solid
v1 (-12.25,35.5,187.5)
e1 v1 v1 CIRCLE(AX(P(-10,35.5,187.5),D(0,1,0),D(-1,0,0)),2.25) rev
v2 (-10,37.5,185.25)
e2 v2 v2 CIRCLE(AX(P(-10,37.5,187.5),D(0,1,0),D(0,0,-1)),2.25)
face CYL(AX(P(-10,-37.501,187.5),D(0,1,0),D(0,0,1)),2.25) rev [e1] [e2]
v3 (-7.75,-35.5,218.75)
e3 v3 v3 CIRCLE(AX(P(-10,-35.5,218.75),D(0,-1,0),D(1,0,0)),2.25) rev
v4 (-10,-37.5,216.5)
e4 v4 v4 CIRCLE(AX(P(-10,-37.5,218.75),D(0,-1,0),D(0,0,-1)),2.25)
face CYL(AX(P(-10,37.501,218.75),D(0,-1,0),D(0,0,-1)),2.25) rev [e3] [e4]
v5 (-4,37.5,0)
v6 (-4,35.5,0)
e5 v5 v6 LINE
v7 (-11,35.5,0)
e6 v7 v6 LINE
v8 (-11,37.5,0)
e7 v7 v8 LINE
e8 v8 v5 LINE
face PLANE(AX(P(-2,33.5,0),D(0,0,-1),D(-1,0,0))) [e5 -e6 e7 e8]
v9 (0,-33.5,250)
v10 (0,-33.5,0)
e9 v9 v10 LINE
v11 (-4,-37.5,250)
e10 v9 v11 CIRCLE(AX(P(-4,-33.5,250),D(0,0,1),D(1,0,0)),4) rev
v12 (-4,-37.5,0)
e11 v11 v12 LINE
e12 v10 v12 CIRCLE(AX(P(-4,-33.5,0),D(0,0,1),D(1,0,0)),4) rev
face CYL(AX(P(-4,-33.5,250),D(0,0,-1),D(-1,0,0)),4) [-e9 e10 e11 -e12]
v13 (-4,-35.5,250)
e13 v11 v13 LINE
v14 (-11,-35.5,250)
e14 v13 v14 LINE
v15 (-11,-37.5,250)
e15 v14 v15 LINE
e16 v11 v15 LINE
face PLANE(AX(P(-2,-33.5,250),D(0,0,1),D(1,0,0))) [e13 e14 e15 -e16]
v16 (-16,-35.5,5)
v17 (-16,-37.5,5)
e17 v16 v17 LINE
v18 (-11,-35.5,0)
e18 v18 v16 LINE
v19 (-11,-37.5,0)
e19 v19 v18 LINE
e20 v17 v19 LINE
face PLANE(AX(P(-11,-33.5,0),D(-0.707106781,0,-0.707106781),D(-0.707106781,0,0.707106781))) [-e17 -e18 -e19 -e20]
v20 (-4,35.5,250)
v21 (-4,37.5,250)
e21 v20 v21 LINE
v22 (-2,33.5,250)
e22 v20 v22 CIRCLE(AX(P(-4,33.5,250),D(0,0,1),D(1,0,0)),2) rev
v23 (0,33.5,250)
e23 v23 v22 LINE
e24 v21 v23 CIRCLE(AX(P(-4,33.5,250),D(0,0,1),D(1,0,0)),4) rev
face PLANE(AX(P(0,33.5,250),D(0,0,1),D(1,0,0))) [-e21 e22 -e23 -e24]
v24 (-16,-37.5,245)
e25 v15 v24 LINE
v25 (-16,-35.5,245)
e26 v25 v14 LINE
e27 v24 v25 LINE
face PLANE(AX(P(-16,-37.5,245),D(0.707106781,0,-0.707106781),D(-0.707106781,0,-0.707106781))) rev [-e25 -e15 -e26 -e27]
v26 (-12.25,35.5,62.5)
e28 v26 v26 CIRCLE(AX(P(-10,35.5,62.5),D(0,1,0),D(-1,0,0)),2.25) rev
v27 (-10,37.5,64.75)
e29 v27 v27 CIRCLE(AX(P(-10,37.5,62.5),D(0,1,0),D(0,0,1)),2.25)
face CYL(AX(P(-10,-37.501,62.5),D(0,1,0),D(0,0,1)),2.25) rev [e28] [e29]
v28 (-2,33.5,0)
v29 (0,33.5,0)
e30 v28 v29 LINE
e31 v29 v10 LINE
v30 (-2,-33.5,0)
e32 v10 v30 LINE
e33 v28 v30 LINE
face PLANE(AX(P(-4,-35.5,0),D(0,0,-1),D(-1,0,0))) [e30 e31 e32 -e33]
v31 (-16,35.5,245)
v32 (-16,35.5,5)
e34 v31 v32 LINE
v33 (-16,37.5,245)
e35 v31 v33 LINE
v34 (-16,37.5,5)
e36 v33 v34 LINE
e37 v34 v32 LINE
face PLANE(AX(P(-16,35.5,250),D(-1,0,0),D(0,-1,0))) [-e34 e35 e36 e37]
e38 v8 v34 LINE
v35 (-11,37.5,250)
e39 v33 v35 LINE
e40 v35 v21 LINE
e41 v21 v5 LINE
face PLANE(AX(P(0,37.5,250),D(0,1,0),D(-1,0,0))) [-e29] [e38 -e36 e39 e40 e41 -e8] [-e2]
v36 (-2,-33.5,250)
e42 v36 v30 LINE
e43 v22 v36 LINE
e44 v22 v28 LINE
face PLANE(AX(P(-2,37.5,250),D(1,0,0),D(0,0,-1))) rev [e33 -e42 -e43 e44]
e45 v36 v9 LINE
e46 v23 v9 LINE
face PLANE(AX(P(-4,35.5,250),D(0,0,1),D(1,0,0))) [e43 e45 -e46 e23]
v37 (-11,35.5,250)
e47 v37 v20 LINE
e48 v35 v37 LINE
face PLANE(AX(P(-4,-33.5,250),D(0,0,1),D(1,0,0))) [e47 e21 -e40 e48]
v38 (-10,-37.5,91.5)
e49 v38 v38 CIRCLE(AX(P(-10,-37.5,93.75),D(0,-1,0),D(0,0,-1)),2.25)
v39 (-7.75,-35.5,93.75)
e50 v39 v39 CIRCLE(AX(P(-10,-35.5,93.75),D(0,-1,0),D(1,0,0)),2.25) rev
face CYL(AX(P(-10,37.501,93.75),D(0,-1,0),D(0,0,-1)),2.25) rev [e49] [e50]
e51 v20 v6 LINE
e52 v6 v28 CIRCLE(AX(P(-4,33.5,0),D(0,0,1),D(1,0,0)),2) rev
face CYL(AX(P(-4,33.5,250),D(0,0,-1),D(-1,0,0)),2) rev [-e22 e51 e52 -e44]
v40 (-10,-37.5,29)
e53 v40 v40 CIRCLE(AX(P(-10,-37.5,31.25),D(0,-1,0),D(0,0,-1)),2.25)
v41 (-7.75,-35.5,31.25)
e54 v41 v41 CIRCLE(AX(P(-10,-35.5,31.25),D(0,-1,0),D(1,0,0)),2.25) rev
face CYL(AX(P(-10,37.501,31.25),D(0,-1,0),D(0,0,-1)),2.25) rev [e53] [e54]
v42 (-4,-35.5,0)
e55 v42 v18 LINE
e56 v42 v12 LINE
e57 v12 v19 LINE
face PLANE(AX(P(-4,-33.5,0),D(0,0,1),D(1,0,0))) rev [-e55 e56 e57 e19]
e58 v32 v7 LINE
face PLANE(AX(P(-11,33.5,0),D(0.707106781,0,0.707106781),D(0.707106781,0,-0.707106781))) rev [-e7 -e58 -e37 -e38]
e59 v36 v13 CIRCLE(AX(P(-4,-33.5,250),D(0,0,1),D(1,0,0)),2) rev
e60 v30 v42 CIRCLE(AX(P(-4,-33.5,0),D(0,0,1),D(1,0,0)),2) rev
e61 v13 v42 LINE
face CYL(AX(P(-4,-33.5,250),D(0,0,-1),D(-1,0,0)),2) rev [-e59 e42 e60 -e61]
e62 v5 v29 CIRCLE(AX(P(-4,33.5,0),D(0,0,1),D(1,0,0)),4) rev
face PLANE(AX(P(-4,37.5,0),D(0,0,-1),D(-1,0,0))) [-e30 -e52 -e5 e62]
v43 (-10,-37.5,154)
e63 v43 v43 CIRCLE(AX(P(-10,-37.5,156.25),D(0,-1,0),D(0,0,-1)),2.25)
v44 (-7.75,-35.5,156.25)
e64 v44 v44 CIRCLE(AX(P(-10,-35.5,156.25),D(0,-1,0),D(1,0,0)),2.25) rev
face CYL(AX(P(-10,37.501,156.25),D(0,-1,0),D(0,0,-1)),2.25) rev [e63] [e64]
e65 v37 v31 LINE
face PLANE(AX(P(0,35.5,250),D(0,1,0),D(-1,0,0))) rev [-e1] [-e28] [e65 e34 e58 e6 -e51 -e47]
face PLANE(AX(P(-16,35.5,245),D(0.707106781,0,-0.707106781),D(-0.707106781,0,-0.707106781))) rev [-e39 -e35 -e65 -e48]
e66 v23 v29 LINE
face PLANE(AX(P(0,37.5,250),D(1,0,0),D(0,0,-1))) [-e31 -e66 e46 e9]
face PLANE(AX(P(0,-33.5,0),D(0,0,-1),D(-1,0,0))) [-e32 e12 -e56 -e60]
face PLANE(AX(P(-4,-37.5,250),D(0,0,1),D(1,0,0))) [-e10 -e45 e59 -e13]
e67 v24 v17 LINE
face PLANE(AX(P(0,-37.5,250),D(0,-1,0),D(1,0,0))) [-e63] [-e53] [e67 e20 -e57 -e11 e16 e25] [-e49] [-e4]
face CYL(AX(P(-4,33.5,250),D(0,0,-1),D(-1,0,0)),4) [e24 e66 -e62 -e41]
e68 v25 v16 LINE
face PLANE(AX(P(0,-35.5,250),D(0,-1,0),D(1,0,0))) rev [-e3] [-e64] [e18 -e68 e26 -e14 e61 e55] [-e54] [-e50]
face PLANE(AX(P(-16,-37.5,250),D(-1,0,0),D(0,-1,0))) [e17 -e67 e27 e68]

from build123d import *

# Parameters (mm, degrees)
BASE_FLANGE1_DEPTH = 250
CHAMFER1_SIZE      = 5
CUT_EXTRUDE1_REACH = 263.498
SKETCH3_R          = 2.25
CUT_EXTRUDE2_REACH = 263.498
SKETCH4_R          = 2.25


# Sheet-metal steps are written as plain solids
with BuildPart() as part:
    # Sketch1 → Base-Flange1 (new body)
    with BuildSketch(Plane.XY):
        with BuildLine():
            Line((-16, 37.5), (-4, 37.5))
            ThreePointArc((-4, 37.5), (-1.171572875, 36.328427125), (0, 33.5))
            Line((0, 33.5), (0, -33.5))
            ThreePointArc((0, -33.5), (-1.171572875, -36.328427125), (-4, -37.5))
            Line((-4, -37.5), (-16, -37.5))
            Line((-16, -37.5), (-16, -35.5))
            Line((-16, -35.5), (-4, -35.5))
            ThreePointArc((-4, -35.5), (-2.585786438, -34.914213562), (-2, -33.5))
            Line((-2, -33.5), (-2, 33.5))
            ThreePointArc((-2, 33.5), (-2.585786438, 34.914213562), (-4, 35.5))
            Line((-4, 35.5), (-16, 35.5))
            Line((-16, 35.5), (-16, 37.5))
        make_face()
    extrude(amount=BASE_FLANGE1_DEPTH)

    # Chamfer1
    chamfer1_edges = [part.edges().sort_by_distance(p)[0] for p in [
        (-16, 36.5, 0),
        (-16, -36.5, 0),
        (-16, 36.5, 250),
        (-16, -36.5, 250),
    ]]
    chamfer(chamfer1_edges, length=CHAMFER1_SIZE)

    # Sketch3 → Cut-Extrude1 (cut, up to next)
    with BuildSketch(Plane(origin=(0, 37.5, 0), x_dir=(1, 0, 0), z_dir=(0, 1, 0)), mode=Mode.PRIVATE) as cut_extrude1_sk1:
        with Locations(Location((-10, -62.5, 0), (0, 0, 270))):
            Circle(SKETCH3_R)
    cut_extrude1_tool1 = extrude(cut_extrude1_sk1.sketch, amount=-CUT_EXTRUDE1_REACH, mode=Mode.PRIVATE) & part.part
    # Sketch3 → Cut-Extrude1 (cut, up to next)
    with BuildSketch(Plane(origin=(0, 37.5, 0), x_dir=(1, 0, 0), z_dir=(0, 1, 0)), mode=Mode.PRIVATE) as cut_extrude1_sk2:
        with Locations(Location((-10, -187.5, 0), (0, 0, 180))):
            Circle(SKETCH3_R)
    cut_extrude1_tool2 = extrude(cut_extrude1_sk2.sketch, amount=-CUT_EXTRUDE1_REACH, mode=Mode.PRIVATE) & part.part
    add(cut_extrude1_tool1.solids().sort_by_distance((-10, 37.5, 62.5))[0], mode=Mode.SUBTRACT)
    add(cut_extrude1_tool2.solids().sort_by_distance((-10, 37.5, 187.5))[0], mode=Mode.SUBTRACT)

    # Sketch4 → Cut-Extrude2 (cut, up to next)
    with BuildSketch(Plane.XZ.offset(37.5), mode=Mode.PRIVATE) as cut_extrude2_sk1:
        with Locations(Location((-10, 31.25, 0), (0, 0, 270))):
            Circle(SKETCH4_R)
    cut_extrude2_tool1 = extrude(cut_extrude2_sk1.sketch, amount=-CUT_EXTRUDE2_REACH, mode=Mode.PRIVATE) & part.part
    # Sketch4 → Cut-Extrude2 (cut, up to next)
    with BuildSketch(Plane.XZ.offset(37.5), mode=Mode.PRIVATE) as cut_extrude2_sk2:
        with Locations(Location((-10, 93.75, 0), (0, 0, 270))):
            Circle(SKETCH4_R)
    cut_extrude2_tool2 = extrude(cut_extrude2_sk2.sketch, amount=-CUT_EXTRUDE2_REACH, mode=Mode.PRIVATE) & part.part
    # Sketch4 → Cut-Extrude2 (cut, up to next)
    with BuildSketch(Plane.XZ.offset(37.5), mode=Mode.PRIVATE) as cut_extrude2_sk3:
        with Locations(Location((-10, 156.25, 0), (0, 0, 270))):
            Circle(SKETCH4_R)
    cut_extrude2_tool3 = extrude(cut_extrude2_sk3.sketch, amount=-CUT_EXTRUDE2_REACH, mode=Mode.PRIVATE) & part.part
    # Sketch4 → Cut-Extrude2 (cut, up to next)
    with BuildSketch(Plane.XZ.offset(37.5), mode=Mode.PRIVATE) as cut_extrude2_sk4:
        with Locations(Location((-10, 218.75, 0), (0, 0, 270))):
            Circle(SKETCH4_R)
    cut_extrude2_tool4 = extrude(cut_extrude2_sk4.sketch, amount=-CUT_EXTRUDE2_REACH, mode=Mode.PRIVATE) & part.part
    add(cut_extrude2_tool1.solids().sort_by_distance((-10, -37.5, 31.25))[0], mode=Mode.SUBTRACT)
    add(cut_extrude2_tool2.solids().sort_by_distance((-10, -37.5, 93.75))[0], mode=Mode.SUBTRACT)
    add(cut_extrude2_tool3.solids().sort_by_distance((-10, -37.5, 156.25))[0], mode=Mode.SUBTRACT)
    add(cut_extrude2_tool4.solids().sort_by_distance((-10, -37.5, 218.75))[0], mode=Mode.SUBTRACT)


solid = part.part
